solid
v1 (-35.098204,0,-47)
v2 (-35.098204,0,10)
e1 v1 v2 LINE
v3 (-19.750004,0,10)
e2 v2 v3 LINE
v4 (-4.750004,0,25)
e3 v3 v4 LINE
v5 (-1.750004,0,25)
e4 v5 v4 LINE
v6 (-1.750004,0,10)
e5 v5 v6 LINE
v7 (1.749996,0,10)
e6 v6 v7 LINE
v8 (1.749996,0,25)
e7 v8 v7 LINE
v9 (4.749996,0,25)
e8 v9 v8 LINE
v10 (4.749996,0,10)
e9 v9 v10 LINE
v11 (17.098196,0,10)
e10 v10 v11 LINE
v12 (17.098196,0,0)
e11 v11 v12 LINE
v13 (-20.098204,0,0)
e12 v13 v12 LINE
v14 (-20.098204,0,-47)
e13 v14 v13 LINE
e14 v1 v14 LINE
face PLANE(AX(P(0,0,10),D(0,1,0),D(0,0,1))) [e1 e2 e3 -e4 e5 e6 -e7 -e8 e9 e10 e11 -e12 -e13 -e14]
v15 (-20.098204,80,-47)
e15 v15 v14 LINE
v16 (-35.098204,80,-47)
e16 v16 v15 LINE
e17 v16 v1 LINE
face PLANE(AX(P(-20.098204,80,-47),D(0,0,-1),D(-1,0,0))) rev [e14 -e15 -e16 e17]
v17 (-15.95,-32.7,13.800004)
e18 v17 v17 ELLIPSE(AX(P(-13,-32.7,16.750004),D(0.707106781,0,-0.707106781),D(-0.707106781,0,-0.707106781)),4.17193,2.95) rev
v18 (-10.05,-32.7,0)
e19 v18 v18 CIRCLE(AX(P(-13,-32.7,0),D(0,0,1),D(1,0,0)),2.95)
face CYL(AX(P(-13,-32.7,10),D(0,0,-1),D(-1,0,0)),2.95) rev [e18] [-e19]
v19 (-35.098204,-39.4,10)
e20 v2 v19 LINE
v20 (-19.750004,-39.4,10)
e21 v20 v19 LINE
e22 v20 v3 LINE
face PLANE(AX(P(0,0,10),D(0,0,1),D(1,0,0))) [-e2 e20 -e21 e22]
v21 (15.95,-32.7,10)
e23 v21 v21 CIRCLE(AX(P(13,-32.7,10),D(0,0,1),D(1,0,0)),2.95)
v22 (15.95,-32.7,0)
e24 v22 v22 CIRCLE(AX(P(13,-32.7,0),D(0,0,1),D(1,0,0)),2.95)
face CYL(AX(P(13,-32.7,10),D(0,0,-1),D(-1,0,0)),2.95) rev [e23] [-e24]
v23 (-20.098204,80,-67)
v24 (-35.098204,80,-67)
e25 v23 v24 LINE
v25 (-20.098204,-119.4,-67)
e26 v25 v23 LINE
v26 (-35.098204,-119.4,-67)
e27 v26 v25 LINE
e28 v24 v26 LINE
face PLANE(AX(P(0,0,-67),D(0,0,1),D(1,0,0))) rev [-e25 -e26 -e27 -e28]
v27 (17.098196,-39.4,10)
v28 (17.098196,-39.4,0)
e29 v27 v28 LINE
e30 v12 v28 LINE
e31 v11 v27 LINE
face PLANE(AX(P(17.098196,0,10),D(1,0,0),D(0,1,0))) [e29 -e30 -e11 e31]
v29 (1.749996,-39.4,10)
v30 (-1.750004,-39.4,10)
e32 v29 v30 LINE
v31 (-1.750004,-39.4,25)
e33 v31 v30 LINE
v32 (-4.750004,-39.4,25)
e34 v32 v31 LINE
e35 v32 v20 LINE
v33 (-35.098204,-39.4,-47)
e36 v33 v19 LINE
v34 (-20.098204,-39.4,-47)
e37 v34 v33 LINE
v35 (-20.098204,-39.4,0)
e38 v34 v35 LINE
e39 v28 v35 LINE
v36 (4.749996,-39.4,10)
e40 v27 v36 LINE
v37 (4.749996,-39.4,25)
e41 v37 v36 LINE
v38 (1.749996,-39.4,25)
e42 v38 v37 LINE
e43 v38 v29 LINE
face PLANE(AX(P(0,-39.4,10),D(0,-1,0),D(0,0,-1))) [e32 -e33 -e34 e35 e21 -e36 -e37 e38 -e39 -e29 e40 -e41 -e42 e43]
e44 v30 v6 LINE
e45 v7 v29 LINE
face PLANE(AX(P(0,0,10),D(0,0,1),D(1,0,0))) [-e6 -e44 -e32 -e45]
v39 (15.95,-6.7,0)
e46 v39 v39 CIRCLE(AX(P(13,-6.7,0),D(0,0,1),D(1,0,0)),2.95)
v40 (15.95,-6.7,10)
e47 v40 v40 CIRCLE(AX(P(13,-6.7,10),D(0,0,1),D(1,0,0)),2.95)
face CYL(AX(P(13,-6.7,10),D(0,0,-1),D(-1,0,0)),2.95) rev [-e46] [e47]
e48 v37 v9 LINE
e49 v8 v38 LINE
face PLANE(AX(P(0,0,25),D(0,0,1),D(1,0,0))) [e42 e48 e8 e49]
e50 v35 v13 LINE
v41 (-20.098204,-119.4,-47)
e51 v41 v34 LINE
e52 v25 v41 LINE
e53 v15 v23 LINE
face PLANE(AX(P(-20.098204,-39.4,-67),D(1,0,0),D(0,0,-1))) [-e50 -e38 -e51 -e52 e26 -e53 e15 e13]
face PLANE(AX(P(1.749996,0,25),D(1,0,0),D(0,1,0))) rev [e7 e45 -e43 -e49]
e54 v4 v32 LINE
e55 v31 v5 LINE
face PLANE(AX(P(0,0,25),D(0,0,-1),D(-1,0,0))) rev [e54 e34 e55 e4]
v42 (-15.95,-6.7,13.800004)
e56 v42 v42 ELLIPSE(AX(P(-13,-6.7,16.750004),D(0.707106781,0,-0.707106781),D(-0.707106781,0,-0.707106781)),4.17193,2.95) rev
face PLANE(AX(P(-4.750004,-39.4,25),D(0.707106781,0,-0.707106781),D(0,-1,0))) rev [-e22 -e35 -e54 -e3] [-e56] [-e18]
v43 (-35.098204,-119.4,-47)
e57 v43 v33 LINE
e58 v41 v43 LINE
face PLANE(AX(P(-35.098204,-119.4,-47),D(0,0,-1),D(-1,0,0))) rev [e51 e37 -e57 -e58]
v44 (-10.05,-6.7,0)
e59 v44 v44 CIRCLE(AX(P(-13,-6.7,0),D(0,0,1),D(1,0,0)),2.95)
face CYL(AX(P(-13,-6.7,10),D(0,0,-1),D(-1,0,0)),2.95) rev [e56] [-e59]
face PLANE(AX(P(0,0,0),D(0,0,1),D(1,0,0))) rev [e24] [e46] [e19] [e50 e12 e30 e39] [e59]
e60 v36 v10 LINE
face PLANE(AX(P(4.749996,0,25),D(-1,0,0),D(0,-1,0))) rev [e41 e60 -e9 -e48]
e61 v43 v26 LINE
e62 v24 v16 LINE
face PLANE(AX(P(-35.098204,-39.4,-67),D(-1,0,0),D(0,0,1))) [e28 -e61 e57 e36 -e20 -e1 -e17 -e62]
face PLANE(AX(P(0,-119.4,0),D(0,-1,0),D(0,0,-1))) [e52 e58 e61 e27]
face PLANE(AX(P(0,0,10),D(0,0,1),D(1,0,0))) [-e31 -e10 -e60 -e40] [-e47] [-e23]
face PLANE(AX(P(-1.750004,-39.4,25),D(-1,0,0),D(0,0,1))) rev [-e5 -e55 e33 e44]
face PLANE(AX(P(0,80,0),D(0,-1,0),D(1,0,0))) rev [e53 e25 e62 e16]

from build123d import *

# Parameters (mm, degrees)
SKETCH1_R           = 2.95
BOSS_EXTRUDE1_DEPTH = 10
SKETCH3_W           = 3
SKETCH3_H           = 39.4
BOSS_EXTRUDE2_DEPTH = 15
SKETCH4_W           = 10
SKETCH4_H           = 39.4
BOSS_EXTRUDE3_DEPTH = 3
SKETCH5_W           = 15
SKETCH5_H           = 39.4
BOSS_EXTRUDE4_DEPTH = 77
SKETCH6_W           = 15
SKETCH6_H           = 20
BOSS_EXTRUDE5_DEPTH = 80
SKETCH7_W           = 15
SKETCH7_H           = 20
BOSS_EXTRUDE6_DEPTH = 80
CHAMFER1_SIZE       = 15


with BuildPart() as part:
    # Sketch1 → Boss-Extrude1 (new body)
    with BuildSketch(Plane.XY):
        Polygon((17.098195917, 0), (7.098195917, 0), (-7.0982035, 0), (-17.0982035, 0), (-17.0982035, -39.4), (17.098195917, -39.4), align=None)
        with Locations((-13, -32.7)):
            Circle(SKETCH1_R, mode=Mode.SUBTRACT)
        with Locations((13, -32.7)):
            Circle(SKETCH1_R, mode=Mode.SUBTRACT)
        with Locations((-13, -6.7)):
            Circle(SKETCH1_R, mode=Mode.SUBTRACT)
        with Locations((13, -6.7)):
            Circle(SKETCH1_R, mode=Mode.SUBTRACT)
    extrude(amount=BOSS_EXTRUDE1_DEPTH)

    # Sketch3 → Boss-Extrude2 (add)
    with BuildSketch(Plane.XY.offset(10)):
        with Locations((3.249996208, -19.7)):
            Rectangle(SKETCH3_W, SKETCH3_H)
        with Locations((-3.250003792, -19.7)):
            Rectangle(SKETCH3_W, SKETCH3_H)
    extrude(amount=BOSS_EXTRUDE2_DEPTH)

    # Sketch4 → Boss-Extrude3 (add)
    with BuildSketch(Plane(origin=(-17.0982035, 0, 0), x_dir=(0, 0, -1), z_dir=(1, 0, 0))):
        with Locations((-5, -19.7)):
            Rectangle(SKETCH4_W, SKETCH4_H)
    extrude(amount=-BOSS_EXTRUDE3_DEPTH)

    # Sketch5 → Boss-Extrude4 (add)
    with BuildSketch(Plane.XY.offset(10)):
        with Locations((-27.5982035, -19.7)):
            Rectangle(SKETCH5_W, SKETCH5_H)
    extrude(amount=-BOSS_EXTRUDE4_DEPTH)

    # Sketch6 → Boss-Extrude5 (add)
    with BuildSketch(Plane(origin=(0, 0, 0), x_dir=(1, 0, 0), z_dir=(0, 1, 0))):
        with Locations((-27.5982035, 57)):
            Rectangle(SKETCH6_W, SKETCH6_H)
    extrude(amount=BOSS_EXTRUDE5_DEPTH)

    # Sketch7 → Boss-Extrude6 (add)
    with BuildSketch(Plane(origin=(0, -39.4, 0), x_dir=(-1, 0, 0), z_dir=(0, -1, 0))):
        with Locations((27.5982035, 57)):
            Rectangle(SKETCH7_W, SKETCH7_H)
    extrude(amount=BOSS_EXTRUDE6_DEPTH)

    # Chamfer1
    # the kernel refuses this chamfer: 15 mm, written as the material it adds along each edge
    with BuildSketch(Plane(origin=(-4.750003792, 0, 10), x_dir=(0.02749587661058638, 0, 0.9996219169112968), z_dir=(0, -1, 0))) as chamfer1_piece_1_section:
        Polygon((CHAMFER1_SIZE * 0.999621916911, CHAMFER1_SIZE * 0.0274958766106), (-CHAMFER1_SIZE * 0.0274958766106, CHAMFER1_SIZE * 0.999621916911), (0, 0), align=None)
    chamfer1_piece_1 = extrude(amount=39.4, mode=Mode.PRIVATE)
    chamfer1_piece_1 = split(chamfer1_piece_1, bisect_by=Plane(origin=(-9.447589606, -19.699993032, 25), z_dir=(0, 0, -1)), keep=Keep.TOP, mode=Mode.PRIVATE)
    chamfer1_piece_1 = chamfer1_piece_1 - Plane(origin=(-13, -32.7, 15.064326231), x_dir=(1, 0, 0), z_dir=(0, 0, -1)) * Cylinder(2.95, 139, mode=Mode.PRIVATE)
    chamfer1_piece_1 = chamfer1_piece_1 - Plane(origin=(-13, -6.7, 15.064326231), x_dir=(1, 0, 0), z_dir=(0, 0, -1)) * Cylinder(2.95, 139, mode=Mode.PRIVATE)
    add(chamfer1_piece_1)


solid = part.part
